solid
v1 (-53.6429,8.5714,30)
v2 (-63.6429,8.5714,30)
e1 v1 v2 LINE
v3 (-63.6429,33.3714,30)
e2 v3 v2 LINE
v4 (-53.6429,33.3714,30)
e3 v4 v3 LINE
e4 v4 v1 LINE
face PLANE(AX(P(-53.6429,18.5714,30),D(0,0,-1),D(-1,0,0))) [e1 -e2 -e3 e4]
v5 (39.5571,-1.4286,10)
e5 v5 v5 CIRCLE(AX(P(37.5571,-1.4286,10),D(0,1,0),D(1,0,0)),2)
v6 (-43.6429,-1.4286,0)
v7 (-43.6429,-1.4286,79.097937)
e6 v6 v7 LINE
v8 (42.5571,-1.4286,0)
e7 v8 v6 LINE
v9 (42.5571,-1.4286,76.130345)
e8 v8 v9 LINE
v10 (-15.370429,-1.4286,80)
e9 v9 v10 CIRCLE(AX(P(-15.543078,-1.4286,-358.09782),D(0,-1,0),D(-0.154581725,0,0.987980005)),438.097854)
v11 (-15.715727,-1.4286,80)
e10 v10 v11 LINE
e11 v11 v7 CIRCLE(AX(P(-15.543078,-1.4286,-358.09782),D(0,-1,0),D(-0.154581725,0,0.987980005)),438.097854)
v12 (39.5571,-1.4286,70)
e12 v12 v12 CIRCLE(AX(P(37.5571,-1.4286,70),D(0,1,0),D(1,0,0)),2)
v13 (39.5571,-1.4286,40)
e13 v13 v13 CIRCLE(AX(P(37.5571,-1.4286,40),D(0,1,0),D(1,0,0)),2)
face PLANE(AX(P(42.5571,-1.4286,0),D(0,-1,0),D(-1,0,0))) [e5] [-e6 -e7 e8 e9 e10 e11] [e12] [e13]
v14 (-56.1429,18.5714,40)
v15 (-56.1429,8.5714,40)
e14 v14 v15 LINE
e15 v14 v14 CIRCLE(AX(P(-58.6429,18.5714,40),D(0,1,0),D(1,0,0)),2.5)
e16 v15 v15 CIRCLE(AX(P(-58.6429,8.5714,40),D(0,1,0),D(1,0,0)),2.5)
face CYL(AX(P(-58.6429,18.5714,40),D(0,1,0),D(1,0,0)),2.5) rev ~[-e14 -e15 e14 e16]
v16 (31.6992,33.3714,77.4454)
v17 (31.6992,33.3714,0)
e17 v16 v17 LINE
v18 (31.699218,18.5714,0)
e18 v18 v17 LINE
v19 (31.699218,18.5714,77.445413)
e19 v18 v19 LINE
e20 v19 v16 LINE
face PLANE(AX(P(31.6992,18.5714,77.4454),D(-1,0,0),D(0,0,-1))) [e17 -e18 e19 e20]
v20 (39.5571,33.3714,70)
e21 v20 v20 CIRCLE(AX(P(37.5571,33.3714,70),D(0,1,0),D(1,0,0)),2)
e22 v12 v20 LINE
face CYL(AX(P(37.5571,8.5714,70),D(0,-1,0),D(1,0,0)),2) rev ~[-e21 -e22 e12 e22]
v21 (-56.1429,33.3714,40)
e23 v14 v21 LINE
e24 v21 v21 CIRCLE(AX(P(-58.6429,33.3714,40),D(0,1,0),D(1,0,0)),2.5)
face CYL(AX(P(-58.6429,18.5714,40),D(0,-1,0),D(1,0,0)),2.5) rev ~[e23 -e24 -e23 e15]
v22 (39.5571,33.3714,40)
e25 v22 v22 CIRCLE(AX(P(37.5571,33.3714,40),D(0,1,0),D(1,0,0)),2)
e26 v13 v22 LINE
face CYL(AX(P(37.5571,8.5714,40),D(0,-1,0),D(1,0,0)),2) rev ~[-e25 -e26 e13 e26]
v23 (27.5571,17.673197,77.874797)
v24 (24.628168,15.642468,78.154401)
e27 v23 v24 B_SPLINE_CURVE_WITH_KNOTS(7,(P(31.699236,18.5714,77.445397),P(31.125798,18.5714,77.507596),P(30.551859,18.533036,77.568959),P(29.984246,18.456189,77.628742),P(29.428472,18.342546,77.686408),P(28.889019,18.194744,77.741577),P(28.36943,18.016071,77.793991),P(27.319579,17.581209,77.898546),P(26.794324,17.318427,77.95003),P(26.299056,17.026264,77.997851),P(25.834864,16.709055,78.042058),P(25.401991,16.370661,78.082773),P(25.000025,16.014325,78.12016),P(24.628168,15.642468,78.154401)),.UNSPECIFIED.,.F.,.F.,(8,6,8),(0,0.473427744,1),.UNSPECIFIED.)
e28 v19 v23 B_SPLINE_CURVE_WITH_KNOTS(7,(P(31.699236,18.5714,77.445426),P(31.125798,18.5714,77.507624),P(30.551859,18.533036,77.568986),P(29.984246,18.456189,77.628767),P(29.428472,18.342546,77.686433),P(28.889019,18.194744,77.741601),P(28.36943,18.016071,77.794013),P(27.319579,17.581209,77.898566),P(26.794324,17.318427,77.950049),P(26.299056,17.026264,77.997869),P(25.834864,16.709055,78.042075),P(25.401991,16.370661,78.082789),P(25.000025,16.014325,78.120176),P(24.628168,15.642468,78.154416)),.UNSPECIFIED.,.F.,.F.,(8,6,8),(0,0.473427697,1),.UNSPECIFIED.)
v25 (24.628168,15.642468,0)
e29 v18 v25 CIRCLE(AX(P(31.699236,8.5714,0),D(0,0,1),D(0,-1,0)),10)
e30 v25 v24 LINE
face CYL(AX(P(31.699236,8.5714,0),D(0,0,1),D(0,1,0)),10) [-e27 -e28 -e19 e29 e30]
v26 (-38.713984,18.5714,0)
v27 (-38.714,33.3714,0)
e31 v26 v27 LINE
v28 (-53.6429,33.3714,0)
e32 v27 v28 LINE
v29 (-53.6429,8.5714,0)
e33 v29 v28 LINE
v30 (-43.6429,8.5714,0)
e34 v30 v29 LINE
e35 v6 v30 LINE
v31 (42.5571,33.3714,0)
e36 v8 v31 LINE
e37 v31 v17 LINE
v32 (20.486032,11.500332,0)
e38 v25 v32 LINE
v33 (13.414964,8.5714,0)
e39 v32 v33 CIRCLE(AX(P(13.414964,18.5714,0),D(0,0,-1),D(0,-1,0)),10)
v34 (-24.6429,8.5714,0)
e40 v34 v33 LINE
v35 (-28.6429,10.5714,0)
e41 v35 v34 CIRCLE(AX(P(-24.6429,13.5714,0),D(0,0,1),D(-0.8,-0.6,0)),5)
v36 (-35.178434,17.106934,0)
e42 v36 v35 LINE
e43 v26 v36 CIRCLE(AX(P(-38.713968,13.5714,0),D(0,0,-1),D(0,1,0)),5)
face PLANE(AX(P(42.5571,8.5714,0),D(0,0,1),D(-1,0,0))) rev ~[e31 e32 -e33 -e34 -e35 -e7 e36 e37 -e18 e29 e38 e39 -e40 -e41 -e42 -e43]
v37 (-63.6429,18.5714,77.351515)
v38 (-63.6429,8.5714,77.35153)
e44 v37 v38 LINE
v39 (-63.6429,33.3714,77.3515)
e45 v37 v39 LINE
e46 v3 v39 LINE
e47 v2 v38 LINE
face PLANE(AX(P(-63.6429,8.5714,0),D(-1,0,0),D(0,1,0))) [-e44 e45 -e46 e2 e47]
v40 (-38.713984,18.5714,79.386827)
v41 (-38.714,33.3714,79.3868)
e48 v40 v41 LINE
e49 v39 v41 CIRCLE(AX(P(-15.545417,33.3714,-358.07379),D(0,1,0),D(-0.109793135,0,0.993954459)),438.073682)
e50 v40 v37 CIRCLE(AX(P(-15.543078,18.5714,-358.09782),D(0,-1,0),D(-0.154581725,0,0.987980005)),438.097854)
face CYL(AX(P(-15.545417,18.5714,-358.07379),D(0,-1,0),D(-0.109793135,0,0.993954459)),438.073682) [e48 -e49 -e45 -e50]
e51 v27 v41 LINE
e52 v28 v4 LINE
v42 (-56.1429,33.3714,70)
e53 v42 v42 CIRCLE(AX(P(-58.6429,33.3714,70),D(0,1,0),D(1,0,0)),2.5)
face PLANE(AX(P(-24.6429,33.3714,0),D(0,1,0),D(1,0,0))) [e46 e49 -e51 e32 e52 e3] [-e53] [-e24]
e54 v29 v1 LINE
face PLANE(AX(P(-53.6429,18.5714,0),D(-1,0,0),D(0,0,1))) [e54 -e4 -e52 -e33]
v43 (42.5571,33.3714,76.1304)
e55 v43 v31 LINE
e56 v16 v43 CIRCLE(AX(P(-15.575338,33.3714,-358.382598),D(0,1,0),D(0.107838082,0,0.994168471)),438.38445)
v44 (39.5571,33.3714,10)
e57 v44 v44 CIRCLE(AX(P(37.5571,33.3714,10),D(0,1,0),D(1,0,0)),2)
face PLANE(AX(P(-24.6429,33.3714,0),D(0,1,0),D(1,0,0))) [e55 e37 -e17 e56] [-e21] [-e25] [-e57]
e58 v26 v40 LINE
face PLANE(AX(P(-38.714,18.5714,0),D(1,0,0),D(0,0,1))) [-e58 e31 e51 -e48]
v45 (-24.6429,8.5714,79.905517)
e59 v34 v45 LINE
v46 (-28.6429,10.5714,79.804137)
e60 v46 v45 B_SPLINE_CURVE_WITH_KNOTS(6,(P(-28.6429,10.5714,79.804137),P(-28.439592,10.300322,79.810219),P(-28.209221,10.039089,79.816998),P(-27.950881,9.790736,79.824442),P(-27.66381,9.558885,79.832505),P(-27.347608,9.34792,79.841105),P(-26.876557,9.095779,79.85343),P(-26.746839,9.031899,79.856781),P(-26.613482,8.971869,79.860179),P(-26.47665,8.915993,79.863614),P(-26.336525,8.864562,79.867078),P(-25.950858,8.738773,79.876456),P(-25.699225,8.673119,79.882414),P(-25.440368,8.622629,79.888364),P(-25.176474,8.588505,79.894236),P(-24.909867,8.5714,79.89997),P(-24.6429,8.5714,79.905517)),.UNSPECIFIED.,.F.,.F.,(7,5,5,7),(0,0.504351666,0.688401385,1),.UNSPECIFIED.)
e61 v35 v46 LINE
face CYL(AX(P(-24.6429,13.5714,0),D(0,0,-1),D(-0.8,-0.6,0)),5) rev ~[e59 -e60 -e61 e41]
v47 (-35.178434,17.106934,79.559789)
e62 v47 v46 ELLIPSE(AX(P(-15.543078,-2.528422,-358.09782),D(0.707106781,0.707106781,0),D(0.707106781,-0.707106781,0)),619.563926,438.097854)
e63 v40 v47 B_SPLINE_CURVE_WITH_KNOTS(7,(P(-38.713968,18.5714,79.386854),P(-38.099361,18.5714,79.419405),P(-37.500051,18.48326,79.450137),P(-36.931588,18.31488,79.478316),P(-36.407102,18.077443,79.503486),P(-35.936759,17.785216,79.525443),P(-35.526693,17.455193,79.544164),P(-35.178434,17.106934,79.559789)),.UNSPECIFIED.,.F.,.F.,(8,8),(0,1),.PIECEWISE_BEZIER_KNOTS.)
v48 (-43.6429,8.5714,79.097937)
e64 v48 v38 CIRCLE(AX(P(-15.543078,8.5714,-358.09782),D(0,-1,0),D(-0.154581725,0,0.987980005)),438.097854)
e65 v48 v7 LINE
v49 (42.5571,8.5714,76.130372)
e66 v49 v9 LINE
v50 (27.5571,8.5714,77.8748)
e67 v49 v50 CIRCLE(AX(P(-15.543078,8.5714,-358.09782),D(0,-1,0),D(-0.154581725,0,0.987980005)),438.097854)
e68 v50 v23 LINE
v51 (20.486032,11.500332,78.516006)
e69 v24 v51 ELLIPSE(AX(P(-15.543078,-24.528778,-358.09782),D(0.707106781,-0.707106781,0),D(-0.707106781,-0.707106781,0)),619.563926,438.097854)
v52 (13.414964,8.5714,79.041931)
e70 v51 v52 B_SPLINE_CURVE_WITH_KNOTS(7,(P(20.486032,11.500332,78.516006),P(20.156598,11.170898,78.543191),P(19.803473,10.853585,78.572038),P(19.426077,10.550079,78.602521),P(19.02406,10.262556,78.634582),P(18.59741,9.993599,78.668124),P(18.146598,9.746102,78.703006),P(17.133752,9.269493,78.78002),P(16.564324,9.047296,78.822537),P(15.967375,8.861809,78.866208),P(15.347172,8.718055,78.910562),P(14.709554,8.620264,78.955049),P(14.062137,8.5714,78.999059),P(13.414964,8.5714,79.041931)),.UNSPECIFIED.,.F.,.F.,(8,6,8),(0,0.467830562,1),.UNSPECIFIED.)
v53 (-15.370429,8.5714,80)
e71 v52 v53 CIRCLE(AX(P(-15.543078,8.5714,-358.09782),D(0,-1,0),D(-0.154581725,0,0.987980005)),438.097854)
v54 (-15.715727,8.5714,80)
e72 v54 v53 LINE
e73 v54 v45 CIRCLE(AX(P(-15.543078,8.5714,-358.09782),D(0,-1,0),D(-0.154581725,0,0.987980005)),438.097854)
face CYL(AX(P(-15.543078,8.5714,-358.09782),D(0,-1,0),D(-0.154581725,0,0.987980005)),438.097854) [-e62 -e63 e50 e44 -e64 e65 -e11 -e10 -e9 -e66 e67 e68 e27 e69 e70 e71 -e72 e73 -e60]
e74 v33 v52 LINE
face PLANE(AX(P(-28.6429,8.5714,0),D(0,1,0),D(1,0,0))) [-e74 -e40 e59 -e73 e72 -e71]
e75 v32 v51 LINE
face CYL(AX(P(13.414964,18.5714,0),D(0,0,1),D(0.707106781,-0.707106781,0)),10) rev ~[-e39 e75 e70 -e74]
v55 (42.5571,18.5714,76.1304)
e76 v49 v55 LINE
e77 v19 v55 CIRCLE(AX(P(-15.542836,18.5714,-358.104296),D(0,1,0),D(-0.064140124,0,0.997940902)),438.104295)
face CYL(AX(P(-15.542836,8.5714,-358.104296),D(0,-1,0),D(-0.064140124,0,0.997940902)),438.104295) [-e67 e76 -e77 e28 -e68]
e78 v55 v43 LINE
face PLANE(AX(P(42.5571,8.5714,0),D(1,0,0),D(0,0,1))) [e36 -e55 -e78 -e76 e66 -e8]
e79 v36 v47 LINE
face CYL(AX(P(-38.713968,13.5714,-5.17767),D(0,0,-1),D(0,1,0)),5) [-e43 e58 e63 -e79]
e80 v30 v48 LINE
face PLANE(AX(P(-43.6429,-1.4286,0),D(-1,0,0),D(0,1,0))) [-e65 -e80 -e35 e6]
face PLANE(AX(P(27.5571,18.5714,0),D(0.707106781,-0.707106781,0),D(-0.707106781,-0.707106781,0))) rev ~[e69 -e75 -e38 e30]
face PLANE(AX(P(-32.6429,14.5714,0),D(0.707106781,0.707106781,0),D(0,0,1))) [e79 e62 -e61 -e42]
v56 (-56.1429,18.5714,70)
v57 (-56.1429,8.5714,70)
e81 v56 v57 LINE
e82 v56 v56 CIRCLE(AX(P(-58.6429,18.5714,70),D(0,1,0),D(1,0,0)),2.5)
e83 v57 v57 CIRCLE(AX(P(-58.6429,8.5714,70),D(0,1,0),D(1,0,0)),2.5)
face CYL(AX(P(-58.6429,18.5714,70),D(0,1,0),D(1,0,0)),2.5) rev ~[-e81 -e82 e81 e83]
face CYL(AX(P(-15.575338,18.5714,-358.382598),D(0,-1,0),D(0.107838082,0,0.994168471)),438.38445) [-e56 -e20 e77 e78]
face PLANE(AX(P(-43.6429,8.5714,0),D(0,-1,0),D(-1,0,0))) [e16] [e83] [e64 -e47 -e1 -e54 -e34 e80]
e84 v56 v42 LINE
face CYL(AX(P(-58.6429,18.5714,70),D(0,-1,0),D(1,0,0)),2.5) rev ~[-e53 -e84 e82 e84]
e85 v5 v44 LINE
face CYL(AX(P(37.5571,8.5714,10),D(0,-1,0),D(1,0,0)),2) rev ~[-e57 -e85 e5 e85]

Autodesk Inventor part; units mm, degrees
ref_plane "YZ Plane" through (0, 0, 0) normal (1, 0, 0) x (0, 1, 0)
ref_plane "XZ Plane" through (0, 0, 0) normal (0, 1, 0) x (-1, 0, 0)
ref_plane "XY Plane" through (0, 0, 0) normal (0, 0, 1) x (1, 0, 0)
sketch "Sketch1" plane through (0, 0, 0) normal (0, 0, 1) x (1, 0, 0)
  line L0 (-43.6429, 8.5714) -> (-63.6429, 8.5714)
  line L1 (-63.6429, 8.5714) -> (-63.6429, 18.5714)
  line L2 (-63.6429, 18.5714) -> (-28.6429, 18.5714)
  line L3 (-28.6429, 18.5714) -> (-28.6429, 8.5714)
  line L4 (-28.6429, 8.5714) -> (42.5571, 8.5714)
  line L5 (42.5571, 8.5714) -> (42.5571, -1.4286)
  line L6 (42.5571, -1.4286) -> (-43.6429, -1.4286)
  line L7 (-43.6429, -1.4286) -> (-43.6429, 8.5714)
  point P0 (0, 0)
  dimension "d0" = 10
  dimension "d1" = 10
  dimension "d2" = 20
  dimension "d3" = 86.2
  dimension "d4" = 15
extrude "Extrusion1" add sketch "Sketch1" along normal blind 80
chamfer "Chamfer1" distance 8 angle 45 1 edges at (-28.6429, 18.5714, 40)
fillet "Fillet1" radius 5 2 edges at (-36.6429, 18.5714, 40) (-28.6429, 8.5714, 40)
sketch "Sketch2" plane through (-63.6429, 18.5714, 80) normal (0, 1, 0) x (1, 0, 0)
  circle A0 centre (5, 10) radius 2.5
  circle A1 centre (5, 40) radius 2.5
  line L0 (24.9289, 0) -> (0, 0) projected
  line L1 (0, 80) -> (0, 0) projected
  line L2 (0, 80) -> (20, 80) projected
  line L3 (20, 80) -> (20, 0) projected
  line L4 (0, 80) -> (10, 80)
  line L5 (10, 80) -> (10, 50)
  line L6 (10, 50) -> (0, 50)
  line L7 (0, 50) -> (0, 80)
  point P0 (63.6429, 80)
  point P1 (20, 50)
  point P2 (0, 50)
  point P3 (10, 80)
  dimension "d11" = 10
  dimension "d12" = 40
  dimension "d13" = 5
  dimension "d14" = 5
  dimension "d15" = 5
  dimension "d16" = 5
  dimension "d31" = 10
extrude "Extrusion2" cut sketch "Sketch2" against normal blind 10 contours A0 | A1 | L1 L2 L5 L6
sketch "Sketch3" plane through (42.5571, 8.5714, 80) normal (0, 1, 0) x (1, 0, 0)
  circle A0 centre (-5, 10) radius 2
  circle A1 centre (-5, 40) radius 2
  circle A2 centre (-5, 70) radius 2
  line L0 (0, 80) -> (0, 0) projected
  line L1 (0, 80) -> (-67.2, 80) projected
  line L2 (0, 0) -> (-67.2, 0) projected
  point P0 (-42.5571, 80)
  dimension "d20" = 4
  dimension "d21" = 4
  dimension "d22" = 4
  dimension "d23" = 5
  dimension "d24" = 5
  dimension "d25" = 5
  dimension "d26" = 10
  dimension "d27" = 40
  dimension "d28" = 10
extrude "Extrusion3" cut sketch "Sketch3" against normal blind 10
sketch "Sketch4" plane through (42.5571, 8.5714, 80) normal (0, 1, 0) x (1, 0, 0)
  arc A0 (-125.8221, 5.2659) -> (2.953, 4.275) centre (-58.1, 438.1) ccw
  line L0 (0, 0) -> (-67.2, 0) projected
  line L1 (0, 80) -> (0, 0) projected
  line L2 (2.953, 4.275) -> (3.8116, -7.869)
  line L3 (3.8116, -7.869) -> (-122.3226, -7.869)
  line L4 (-122.3226, -7.869) -> (-125.8221, 5.2659)
  point P0 (-42.5571, 80)
  point P1 (0, 3.8696)
  point P2 (-58.1, 0)
  point P3 (-0.5169, 0)
  dimension "d32" = 876.2
  dimension "d33" = 0
  dimension "d34" = 58.1
extrude "Extrusion4" cut sketch "Sketch4" along normal through all both and the other way through all
sketch "Sketch5" plane through (-24.6429, 8.5714, 0) normal (0, 1, 0) x (1, 0, 0)
  circle A0 centre (62.2, -70) radius 2 projected
  circle A1 centre (62.2, -70) radius 2
  circle A2 centre (62.2, -40) radius 2 projected
  circle A3 centre (62.2, -40) radius 2
  circle A4 centre (62.2, -10) radius 2 projected
  circle A5 centre (62.2, -10) radius 2
  line L0 (67.2, 0) -> (67.2, -80) projected
  line L1 (67.2, -76.1304) -> (67.2, 0)
  line L2 (67.2, 0) -> (52.2, 0)
  line L3 (67.2, 0) -> (0, 0) projected
  line L4 (52.2, 0) -> (52.2, -77.8748)
  arc A6 (-19, -79.0979) -> (67.2, -76.1304) centre (9.1, 358.1) ccw projected
  arc A7 (-55.9, -73.5326) -> (94.1, -73.5326) centre (19.1, 358.0999) ccw projected
  arc A8 (-55.9, -73.5326) -> (94.1, -73.5326) centre (19.1, 358.0999) ccw projected
  arc A9 (-55.9, -73.5326) -> (94.1, -73.5326) centre (19.1, 358.0999) ccw projected
  circle A10 centre (-30.9, 438.0999) radius 2 projected
  circle A11 centre (-30.9, 308.0999) radius 2 projected
  circle A12 centre (69.1, 278.0999) radius 2 projected
  circle A13 centre (69.1, 308.0999) radius 2 projected
  circle A14 centre (69.1, 468.0999) radius 2 projected
  circle A15 centre (-30.9, 468.0999) radius 2 projected
  circle A16 centre (69.1, 408.0999) radius 2 projected
  circle A17 centre (-30.9, 248.0999) radius 2 projected
  circle A18 centre (69.1, 248.0999) radius 2 projected
  circle A19 centre (-30.9, 278.0999) radius 2 projected
  circle A20 centre (-30.9, 408.0999) radius 2 projected
  circle A21 centre (69.1, 438.0999) radius 2 projected
  circle A22 centre (-24, 756.1997) radius 2 projected
  circle A23 centre (62.2, -10) radius 2 projected
  circle A24 centre (62.2, -70) radius 2 projected
  circle A25 centre (-34, -40) radius 2.5 projected
  circle A26 centre (-24, 726.1997) radius 2 projected
  circle A27 centre (-24, 786.1997) radius 2 projected
  circle A28 centre (62.2, -40) radius 2 projected
  circle A29 centre (-34, -70) radius 2.5 projected
  circle A30 centre (72.2, 756.1997) radius 2.5 projected
  circle A31 centre (72.2, 786.1997) radius 2.5 projected
  circle A32 centre (-0.9, 338.0999) radius 2.5 projected
  circle A33 centre (39.1, 338.0999) radius 2.5 projected
  circle A34 centre (-0.9, 378.0999) radius 2.5 projected
  circle A35 centre (39.1, 378.0999) radius 2.5 projected
  circle A36 centre (19.1, 358.0999) radius 7.5 projected
  arc A37 (-55.9, -73.5326) -> (94.1, -73.5326) centre (19.1, 358.0999) ccw projected
  line L5 (94.1, -73.5326) -> (94.1, 789.7324) projected
  arc A38 (94.1, 789.7324) -> (-55.9, 789.7324) centre (19.1, 358.0999) ccw projected
  line L6 (-55.9, 789.7324) -> (-55.9, -73.5326) projected
  circle A39 centre (69.1, 158.0999) radius 2 projected
  circle A40 centre (-30.9, 38.0999) radius 2 projected
  circle A41 centre (69.1, 558.0999) radius 2 projected
  circle A42 centre (69.1, 518.0999) radius 2 projected
  circle A43 centre (-30.9, 638.0999) radius 2 projected
  circle A44 centre (69.1, 638.0999) radius 2 projected
  circle A45 centre (-30.9, 598.0999) radius 2 projected
  circle A46 centre (69.1, 118.0999) radius 2 projected
  circle A47 centre (-30.9, 118.0999) radius 2 projected
  circle A48 centre (69.1, 78.0999) radius 2 projected
  circle A49 centre (-30.9, 198.0999) radius 2 projected
  circle A50 centre (69.1, 198.0999) radius 2 projected
  circle A51 centre (-30.9, 678.0999) radius 2 projected
  circle A52 centre (-30.9, 558.0999) radius 2 projected
  circle A53 centre (69.1, 678.0999) radius 2 projected
  circle A54 centre (-30.9, 518.0999) radius 2 projected
  circle A55 centre (69.1, 598.0999) radius 2 projected
  circle A56 centre (69.1, 38.0999) radius 2 projected
  circle A57 centre (-30.9, 158.0999) radius 2 projected
  circle A58 centre (-30.9, 78.0999) radius 2 projected
  circle A59 centre (29.9074, 423.6249) radius 2 projected
  circle A60 centre (-0.0926, 473.6249) radius 2 projected
  circle A61 centre (-0.0926, 423.6249) radius 2 projected
  circle A62 centre (29.9074, 473.6249) radius 2 projected
  point P0 (24.6429, 0)
  point P1 (67.0008, -76.157)
  dimension "d37" = 15
extrude "Extrusion5" add sketch "Sketch5" along normal blind 10 contours L0 A6 L4 L2
chamfer "Chamfer2" distance 10 angle 45 1 edges at (27.5571, 8.5714, 38.9374)
fillet "Fillet2" radius 10 3 edges at (17.5572, 8.5714, 39.3739) (27.5571, 18.5713, 38.9374) (27.5571, 18.5714, 38.9374)
sketch "Sketch6" plane through (-24.6429, 18.5714, 0) normal (0, 1, 0) x (1, 0, 0)
  circle A0 centre (62.2, -70) radius 2 projected
  circle A1 centre (62.2, -40) radius 2 projected
  circle A2 centre (62.2, -10) radius 2 projected
  line L0 (56.3421, -77.4454) -> (56.3421, 0) projected
  arc A3 (56.3421, -77.4454) -> (67.2, -76.1304) centre (9.1, 358.1) ccw projected
  line L1 (67.2, -76.1304) -> (67.2, 0) projected
  line L2 (67.2, 0) -> (56.3421, 0) projected
  circle A4 centre (-34, -70) radius 2.5 projected
  circle A5 centre (-34, -40) radius 2.5 projected
  arc A6 (-39, -77.3515) -> (-14.0711, -79.3868) centre (9.1, 358.1) ccw projected
  line L3 (-14.0711, 0) -> (-14.0711, -79.3868) projected
  line L4 (-14.0711, 0) -> (-29, 0) projected
  line L5 (-29, 0) -> (-29, -30) projected
  line L6 (-29, -30) -> (-39, -30) projected
  line L7 (-39, -30) -> (-39, -77.3515) projected
  point P0 (24.6429, 0)
extrude "Extrusion6" add sketch "Sketch6" along normal blind 14.8
properties part number "ReleaseMec2.0TopPlate"
